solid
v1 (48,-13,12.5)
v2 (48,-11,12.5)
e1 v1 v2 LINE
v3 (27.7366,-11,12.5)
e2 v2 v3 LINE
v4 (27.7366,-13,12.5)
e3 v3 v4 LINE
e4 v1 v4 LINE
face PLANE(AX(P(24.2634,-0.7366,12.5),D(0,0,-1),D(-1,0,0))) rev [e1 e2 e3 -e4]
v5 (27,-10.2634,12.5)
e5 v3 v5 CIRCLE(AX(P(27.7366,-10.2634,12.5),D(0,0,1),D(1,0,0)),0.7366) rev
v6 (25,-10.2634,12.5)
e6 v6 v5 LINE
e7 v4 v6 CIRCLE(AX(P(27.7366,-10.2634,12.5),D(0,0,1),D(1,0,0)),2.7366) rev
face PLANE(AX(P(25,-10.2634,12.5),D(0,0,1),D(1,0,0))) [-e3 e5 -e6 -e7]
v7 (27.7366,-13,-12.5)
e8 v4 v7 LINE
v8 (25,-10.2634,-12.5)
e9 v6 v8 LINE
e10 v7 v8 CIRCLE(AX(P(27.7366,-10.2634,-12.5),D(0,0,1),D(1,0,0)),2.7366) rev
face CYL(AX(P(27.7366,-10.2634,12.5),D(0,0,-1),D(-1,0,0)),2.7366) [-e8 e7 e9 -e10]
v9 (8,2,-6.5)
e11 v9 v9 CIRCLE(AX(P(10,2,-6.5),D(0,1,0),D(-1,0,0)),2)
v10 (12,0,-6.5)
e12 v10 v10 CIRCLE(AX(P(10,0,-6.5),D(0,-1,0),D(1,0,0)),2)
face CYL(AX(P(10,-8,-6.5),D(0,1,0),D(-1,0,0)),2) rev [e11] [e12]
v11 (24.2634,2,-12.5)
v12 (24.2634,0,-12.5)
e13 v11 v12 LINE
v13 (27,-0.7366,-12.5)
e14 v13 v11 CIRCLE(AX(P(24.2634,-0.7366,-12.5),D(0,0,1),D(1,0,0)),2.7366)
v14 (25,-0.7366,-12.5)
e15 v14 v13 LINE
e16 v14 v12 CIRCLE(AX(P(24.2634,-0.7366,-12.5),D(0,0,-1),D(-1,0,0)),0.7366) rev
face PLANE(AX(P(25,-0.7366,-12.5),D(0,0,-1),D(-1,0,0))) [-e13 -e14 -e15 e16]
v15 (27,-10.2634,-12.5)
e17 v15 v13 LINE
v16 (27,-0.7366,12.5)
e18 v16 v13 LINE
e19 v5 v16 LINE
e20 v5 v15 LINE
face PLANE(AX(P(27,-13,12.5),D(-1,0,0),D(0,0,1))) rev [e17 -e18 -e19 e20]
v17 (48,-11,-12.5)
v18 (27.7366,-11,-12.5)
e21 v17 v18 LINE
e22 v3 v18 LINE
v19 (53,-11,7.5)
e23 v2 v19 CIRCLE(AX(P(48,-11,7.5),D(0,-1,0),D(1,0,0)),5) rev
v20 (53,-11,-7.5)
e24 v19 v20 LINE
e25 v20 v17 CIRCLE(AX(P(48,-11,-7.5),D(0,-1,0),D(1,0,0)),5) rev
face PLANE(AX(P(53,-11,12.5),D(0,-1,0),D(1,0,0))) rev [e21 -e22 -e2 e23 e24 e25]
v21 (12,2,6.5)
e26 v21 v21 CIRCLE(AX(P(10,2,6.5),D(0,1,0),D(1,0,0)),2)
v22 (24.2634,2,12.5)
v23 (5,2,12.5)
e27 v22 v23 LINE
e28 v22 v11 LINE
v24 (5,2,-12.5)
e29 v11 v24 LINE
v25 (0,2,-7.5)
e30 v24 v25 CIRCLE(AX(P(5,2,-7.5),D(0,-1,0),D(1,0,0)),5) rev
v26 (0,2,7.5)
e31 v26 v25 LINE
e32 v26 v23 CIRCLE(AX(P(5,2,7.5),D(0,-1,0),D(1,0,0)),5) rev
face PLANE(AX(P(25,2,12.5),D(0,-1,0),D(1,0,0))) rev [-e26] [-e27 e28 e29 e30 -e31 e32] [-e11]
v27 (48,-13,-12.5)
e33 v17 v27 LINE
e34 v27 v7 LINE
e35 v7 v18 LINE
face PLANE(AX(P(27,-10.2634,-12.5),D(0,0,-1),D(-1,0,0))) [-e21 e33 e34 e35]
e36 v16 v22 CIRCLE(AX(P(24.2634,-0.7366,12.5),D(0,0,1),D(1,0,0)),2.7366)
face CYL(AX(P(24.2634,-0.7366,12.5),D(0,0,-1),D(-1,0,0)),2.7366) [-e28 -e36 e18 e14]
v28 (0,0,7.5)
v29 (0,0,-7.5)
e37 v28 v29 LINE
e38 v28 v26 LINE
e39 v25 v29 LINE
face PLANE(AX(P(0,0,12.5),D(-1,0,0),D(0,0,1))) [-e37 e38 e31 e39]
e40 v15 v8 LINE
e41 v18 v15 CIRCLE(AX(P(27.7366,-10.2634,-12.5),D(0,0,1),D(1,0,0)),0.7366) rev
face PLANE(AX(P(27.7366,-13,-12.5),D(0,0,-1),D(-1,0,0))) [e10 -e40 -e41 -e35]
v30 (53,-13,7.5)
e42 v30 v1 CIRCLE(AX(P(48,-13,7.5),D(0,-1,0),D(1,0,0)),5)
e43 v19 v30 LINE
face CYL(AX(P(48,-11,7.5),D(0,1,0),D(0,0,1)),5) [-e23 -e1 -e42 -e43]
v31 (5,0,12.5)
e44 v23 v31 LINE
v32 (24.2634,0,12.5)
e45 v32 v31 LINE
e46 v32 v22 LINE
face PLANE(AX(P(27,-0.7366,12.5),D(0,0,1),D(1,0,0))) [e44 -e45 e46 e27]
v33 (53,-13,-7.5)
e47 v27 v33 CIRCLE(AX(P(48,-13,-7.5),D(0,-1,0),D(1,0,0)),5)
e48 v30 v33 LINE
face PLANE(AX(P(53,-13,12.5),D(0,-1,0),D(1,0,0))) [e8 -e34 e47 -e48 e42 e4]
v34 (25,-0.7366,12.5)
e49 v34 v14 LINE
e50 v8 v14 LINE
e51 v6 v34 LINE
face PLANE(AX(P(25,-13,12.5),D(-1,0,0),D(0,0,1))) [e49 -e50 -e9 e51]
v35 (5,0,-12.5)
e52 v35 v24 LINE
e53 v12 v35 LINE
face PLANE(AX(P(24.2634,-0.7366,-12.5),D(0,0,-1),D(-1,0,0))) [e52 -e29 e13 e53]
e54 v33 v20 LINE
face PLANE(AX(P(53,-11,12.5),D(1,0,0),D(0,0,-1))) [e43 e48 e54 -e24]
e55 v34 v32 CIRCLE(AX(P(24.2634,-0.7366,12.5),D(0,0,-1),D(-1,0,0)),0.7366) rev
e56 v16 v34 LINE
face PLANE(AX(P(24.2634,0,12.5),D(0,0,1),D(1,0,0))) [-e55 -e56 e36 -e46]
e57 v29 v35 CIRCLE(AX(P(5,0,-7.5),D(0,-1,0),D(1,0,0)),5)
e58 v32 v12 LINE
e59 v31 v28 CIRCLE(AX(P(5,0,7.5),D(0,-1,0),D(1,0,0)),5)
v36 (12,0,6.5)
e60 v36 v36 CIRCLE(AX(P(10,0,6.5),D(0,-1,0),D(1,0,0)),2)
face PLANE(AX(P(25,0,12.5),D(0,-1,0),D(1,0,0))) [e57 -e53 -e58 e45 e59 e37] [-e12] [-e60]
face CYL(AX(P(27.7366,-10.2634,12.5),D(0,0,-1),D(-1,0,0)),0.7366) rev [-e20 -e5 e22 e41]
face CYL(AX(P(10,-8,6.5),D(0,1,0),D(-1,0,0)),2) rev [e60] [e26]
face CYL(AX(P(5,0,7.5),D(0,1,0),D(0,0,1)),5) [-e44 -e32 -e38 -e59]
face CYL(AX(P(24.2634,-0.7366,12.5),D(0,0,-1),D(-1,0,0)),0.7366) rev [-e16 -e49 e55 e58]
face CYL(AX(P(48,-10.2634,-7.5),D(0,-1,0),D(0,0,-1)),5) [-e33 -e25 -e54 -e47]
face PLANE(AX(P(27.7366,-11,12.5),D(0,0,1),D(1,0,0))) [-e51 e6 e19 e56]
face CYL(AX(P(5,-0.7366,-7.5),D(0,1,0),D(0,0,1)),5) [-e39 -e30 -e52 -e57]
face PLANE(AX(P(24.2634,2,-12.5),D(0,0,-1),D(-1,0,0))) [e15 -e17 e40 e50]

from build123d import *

# Parameters (mm, degrees)
TABAN_FLAN_1_DEPTH    = 12.5
K_ELERI_START         = -13
K_ELERI_K_R1_DEPTH    = 15
IZIM2_R               = 2
KES_EKSTR_ZYON1_DEPTH = 10


# Read off the part's stored shape, not the designer's step: Köşeleri kır1
# Sheet-metal steps are written as plain solids
with BuildPart() as part:
    # Çizim1 → Taban-Flanş1 (new, symmetric)
    with BuildSketch(Plane.XY):
        with BuildLine():
            Line((53, -13), (27.7366, -13))
            ThreePointArc((27.7366, -13), (25.801531583, -12.198468417), (25, -10.2634))
            Line((25, -10.2634), (25, -0.7366))
            ThreePointArc((25, -0.7366), (24.784254855, -0.215745145), (24.2634, 0))
            Line((24.2634, 0), (0, 0))
            Line((0, 0), (0, 2))
            Line((0, 2), (24.2634, 2))
            ThreePointArc((24.2634, 2), (26.198468417, 1.198468417), (27, -0.7366))
            Line((27, -0.7366), (27, -10.2634))
            ThreePointArc((27, -10.2634), (27.215745145, -10.784254855), (27.7366, -11))
            Line((27.7366, -11), (53, -11))
            Line((53, -11), (53, -13))
        make_face()
    extrude(amount=TABAN_FLAN_1_DEPTH, both=True)

    # Köşeleri kır1 outline → Köşeleri kır1 (cut)
    with BuildSketch(Plane(origin=(0, 0, 0), x_dir=(1, 0, 0), z_dir=(0, 1, 0)).offset(K_ELERI_START)):
        with BuildLine():
            Line((53, 12.5), (48, 12.5))
            ThreePointArc((48, 12.5), (51.535533906, 11.035533906), (53, 7.5))
            Line((53, 7.5), (53, 12.5))
        make_face()
        with BuildLine():
            Line((53, -12.5), (53, -7.5))
            ThreePointArc((53, -7.5), (51.535533906, -11.035533906), (48, -12.5))
            Line((48, -12.5), (53, -12.5))
        make_face()
        with BuildLine():
            ThreePointArc((5, -12.5), (1.464466094, -11.035533906), (0, -7.5))
            Line((0, -7.5), (0, -12.5))
            Line((0, -12.5), (5, -12.5))
        make_face()
        with BuildLine():
            ThreePointArc((0, 7.5), (1.464466094, 11.035533906), (5, 12.5))
            Line((5, 12.5), (0, 12.5))
            Line((0, 12.5), (0, 7.5))
        make_face()
    extrude(amount=K_ELERI_K_R1_DEPTH, mode=Mode.SUBTRACT)

    # Çizim2 → Kes-Ekstrüzyon1 (cut)
    with BuildSketch(Plane(origin=(0, 2, 0), x_dir=(1, 0, 0), z_dir=(0, 1, 0))):
        with Locations(Location((10, 6.5, 0), (0, 0, 180))):
            Circle(IZIM2_R)
        with Locations((10, -6.5)):
            Circle(IZIM2_R)
    extrude(amount=-KES_EKSTR_ZYON1_DEPTH, mode=Mode.SUBTRACT)


solid = part.part
